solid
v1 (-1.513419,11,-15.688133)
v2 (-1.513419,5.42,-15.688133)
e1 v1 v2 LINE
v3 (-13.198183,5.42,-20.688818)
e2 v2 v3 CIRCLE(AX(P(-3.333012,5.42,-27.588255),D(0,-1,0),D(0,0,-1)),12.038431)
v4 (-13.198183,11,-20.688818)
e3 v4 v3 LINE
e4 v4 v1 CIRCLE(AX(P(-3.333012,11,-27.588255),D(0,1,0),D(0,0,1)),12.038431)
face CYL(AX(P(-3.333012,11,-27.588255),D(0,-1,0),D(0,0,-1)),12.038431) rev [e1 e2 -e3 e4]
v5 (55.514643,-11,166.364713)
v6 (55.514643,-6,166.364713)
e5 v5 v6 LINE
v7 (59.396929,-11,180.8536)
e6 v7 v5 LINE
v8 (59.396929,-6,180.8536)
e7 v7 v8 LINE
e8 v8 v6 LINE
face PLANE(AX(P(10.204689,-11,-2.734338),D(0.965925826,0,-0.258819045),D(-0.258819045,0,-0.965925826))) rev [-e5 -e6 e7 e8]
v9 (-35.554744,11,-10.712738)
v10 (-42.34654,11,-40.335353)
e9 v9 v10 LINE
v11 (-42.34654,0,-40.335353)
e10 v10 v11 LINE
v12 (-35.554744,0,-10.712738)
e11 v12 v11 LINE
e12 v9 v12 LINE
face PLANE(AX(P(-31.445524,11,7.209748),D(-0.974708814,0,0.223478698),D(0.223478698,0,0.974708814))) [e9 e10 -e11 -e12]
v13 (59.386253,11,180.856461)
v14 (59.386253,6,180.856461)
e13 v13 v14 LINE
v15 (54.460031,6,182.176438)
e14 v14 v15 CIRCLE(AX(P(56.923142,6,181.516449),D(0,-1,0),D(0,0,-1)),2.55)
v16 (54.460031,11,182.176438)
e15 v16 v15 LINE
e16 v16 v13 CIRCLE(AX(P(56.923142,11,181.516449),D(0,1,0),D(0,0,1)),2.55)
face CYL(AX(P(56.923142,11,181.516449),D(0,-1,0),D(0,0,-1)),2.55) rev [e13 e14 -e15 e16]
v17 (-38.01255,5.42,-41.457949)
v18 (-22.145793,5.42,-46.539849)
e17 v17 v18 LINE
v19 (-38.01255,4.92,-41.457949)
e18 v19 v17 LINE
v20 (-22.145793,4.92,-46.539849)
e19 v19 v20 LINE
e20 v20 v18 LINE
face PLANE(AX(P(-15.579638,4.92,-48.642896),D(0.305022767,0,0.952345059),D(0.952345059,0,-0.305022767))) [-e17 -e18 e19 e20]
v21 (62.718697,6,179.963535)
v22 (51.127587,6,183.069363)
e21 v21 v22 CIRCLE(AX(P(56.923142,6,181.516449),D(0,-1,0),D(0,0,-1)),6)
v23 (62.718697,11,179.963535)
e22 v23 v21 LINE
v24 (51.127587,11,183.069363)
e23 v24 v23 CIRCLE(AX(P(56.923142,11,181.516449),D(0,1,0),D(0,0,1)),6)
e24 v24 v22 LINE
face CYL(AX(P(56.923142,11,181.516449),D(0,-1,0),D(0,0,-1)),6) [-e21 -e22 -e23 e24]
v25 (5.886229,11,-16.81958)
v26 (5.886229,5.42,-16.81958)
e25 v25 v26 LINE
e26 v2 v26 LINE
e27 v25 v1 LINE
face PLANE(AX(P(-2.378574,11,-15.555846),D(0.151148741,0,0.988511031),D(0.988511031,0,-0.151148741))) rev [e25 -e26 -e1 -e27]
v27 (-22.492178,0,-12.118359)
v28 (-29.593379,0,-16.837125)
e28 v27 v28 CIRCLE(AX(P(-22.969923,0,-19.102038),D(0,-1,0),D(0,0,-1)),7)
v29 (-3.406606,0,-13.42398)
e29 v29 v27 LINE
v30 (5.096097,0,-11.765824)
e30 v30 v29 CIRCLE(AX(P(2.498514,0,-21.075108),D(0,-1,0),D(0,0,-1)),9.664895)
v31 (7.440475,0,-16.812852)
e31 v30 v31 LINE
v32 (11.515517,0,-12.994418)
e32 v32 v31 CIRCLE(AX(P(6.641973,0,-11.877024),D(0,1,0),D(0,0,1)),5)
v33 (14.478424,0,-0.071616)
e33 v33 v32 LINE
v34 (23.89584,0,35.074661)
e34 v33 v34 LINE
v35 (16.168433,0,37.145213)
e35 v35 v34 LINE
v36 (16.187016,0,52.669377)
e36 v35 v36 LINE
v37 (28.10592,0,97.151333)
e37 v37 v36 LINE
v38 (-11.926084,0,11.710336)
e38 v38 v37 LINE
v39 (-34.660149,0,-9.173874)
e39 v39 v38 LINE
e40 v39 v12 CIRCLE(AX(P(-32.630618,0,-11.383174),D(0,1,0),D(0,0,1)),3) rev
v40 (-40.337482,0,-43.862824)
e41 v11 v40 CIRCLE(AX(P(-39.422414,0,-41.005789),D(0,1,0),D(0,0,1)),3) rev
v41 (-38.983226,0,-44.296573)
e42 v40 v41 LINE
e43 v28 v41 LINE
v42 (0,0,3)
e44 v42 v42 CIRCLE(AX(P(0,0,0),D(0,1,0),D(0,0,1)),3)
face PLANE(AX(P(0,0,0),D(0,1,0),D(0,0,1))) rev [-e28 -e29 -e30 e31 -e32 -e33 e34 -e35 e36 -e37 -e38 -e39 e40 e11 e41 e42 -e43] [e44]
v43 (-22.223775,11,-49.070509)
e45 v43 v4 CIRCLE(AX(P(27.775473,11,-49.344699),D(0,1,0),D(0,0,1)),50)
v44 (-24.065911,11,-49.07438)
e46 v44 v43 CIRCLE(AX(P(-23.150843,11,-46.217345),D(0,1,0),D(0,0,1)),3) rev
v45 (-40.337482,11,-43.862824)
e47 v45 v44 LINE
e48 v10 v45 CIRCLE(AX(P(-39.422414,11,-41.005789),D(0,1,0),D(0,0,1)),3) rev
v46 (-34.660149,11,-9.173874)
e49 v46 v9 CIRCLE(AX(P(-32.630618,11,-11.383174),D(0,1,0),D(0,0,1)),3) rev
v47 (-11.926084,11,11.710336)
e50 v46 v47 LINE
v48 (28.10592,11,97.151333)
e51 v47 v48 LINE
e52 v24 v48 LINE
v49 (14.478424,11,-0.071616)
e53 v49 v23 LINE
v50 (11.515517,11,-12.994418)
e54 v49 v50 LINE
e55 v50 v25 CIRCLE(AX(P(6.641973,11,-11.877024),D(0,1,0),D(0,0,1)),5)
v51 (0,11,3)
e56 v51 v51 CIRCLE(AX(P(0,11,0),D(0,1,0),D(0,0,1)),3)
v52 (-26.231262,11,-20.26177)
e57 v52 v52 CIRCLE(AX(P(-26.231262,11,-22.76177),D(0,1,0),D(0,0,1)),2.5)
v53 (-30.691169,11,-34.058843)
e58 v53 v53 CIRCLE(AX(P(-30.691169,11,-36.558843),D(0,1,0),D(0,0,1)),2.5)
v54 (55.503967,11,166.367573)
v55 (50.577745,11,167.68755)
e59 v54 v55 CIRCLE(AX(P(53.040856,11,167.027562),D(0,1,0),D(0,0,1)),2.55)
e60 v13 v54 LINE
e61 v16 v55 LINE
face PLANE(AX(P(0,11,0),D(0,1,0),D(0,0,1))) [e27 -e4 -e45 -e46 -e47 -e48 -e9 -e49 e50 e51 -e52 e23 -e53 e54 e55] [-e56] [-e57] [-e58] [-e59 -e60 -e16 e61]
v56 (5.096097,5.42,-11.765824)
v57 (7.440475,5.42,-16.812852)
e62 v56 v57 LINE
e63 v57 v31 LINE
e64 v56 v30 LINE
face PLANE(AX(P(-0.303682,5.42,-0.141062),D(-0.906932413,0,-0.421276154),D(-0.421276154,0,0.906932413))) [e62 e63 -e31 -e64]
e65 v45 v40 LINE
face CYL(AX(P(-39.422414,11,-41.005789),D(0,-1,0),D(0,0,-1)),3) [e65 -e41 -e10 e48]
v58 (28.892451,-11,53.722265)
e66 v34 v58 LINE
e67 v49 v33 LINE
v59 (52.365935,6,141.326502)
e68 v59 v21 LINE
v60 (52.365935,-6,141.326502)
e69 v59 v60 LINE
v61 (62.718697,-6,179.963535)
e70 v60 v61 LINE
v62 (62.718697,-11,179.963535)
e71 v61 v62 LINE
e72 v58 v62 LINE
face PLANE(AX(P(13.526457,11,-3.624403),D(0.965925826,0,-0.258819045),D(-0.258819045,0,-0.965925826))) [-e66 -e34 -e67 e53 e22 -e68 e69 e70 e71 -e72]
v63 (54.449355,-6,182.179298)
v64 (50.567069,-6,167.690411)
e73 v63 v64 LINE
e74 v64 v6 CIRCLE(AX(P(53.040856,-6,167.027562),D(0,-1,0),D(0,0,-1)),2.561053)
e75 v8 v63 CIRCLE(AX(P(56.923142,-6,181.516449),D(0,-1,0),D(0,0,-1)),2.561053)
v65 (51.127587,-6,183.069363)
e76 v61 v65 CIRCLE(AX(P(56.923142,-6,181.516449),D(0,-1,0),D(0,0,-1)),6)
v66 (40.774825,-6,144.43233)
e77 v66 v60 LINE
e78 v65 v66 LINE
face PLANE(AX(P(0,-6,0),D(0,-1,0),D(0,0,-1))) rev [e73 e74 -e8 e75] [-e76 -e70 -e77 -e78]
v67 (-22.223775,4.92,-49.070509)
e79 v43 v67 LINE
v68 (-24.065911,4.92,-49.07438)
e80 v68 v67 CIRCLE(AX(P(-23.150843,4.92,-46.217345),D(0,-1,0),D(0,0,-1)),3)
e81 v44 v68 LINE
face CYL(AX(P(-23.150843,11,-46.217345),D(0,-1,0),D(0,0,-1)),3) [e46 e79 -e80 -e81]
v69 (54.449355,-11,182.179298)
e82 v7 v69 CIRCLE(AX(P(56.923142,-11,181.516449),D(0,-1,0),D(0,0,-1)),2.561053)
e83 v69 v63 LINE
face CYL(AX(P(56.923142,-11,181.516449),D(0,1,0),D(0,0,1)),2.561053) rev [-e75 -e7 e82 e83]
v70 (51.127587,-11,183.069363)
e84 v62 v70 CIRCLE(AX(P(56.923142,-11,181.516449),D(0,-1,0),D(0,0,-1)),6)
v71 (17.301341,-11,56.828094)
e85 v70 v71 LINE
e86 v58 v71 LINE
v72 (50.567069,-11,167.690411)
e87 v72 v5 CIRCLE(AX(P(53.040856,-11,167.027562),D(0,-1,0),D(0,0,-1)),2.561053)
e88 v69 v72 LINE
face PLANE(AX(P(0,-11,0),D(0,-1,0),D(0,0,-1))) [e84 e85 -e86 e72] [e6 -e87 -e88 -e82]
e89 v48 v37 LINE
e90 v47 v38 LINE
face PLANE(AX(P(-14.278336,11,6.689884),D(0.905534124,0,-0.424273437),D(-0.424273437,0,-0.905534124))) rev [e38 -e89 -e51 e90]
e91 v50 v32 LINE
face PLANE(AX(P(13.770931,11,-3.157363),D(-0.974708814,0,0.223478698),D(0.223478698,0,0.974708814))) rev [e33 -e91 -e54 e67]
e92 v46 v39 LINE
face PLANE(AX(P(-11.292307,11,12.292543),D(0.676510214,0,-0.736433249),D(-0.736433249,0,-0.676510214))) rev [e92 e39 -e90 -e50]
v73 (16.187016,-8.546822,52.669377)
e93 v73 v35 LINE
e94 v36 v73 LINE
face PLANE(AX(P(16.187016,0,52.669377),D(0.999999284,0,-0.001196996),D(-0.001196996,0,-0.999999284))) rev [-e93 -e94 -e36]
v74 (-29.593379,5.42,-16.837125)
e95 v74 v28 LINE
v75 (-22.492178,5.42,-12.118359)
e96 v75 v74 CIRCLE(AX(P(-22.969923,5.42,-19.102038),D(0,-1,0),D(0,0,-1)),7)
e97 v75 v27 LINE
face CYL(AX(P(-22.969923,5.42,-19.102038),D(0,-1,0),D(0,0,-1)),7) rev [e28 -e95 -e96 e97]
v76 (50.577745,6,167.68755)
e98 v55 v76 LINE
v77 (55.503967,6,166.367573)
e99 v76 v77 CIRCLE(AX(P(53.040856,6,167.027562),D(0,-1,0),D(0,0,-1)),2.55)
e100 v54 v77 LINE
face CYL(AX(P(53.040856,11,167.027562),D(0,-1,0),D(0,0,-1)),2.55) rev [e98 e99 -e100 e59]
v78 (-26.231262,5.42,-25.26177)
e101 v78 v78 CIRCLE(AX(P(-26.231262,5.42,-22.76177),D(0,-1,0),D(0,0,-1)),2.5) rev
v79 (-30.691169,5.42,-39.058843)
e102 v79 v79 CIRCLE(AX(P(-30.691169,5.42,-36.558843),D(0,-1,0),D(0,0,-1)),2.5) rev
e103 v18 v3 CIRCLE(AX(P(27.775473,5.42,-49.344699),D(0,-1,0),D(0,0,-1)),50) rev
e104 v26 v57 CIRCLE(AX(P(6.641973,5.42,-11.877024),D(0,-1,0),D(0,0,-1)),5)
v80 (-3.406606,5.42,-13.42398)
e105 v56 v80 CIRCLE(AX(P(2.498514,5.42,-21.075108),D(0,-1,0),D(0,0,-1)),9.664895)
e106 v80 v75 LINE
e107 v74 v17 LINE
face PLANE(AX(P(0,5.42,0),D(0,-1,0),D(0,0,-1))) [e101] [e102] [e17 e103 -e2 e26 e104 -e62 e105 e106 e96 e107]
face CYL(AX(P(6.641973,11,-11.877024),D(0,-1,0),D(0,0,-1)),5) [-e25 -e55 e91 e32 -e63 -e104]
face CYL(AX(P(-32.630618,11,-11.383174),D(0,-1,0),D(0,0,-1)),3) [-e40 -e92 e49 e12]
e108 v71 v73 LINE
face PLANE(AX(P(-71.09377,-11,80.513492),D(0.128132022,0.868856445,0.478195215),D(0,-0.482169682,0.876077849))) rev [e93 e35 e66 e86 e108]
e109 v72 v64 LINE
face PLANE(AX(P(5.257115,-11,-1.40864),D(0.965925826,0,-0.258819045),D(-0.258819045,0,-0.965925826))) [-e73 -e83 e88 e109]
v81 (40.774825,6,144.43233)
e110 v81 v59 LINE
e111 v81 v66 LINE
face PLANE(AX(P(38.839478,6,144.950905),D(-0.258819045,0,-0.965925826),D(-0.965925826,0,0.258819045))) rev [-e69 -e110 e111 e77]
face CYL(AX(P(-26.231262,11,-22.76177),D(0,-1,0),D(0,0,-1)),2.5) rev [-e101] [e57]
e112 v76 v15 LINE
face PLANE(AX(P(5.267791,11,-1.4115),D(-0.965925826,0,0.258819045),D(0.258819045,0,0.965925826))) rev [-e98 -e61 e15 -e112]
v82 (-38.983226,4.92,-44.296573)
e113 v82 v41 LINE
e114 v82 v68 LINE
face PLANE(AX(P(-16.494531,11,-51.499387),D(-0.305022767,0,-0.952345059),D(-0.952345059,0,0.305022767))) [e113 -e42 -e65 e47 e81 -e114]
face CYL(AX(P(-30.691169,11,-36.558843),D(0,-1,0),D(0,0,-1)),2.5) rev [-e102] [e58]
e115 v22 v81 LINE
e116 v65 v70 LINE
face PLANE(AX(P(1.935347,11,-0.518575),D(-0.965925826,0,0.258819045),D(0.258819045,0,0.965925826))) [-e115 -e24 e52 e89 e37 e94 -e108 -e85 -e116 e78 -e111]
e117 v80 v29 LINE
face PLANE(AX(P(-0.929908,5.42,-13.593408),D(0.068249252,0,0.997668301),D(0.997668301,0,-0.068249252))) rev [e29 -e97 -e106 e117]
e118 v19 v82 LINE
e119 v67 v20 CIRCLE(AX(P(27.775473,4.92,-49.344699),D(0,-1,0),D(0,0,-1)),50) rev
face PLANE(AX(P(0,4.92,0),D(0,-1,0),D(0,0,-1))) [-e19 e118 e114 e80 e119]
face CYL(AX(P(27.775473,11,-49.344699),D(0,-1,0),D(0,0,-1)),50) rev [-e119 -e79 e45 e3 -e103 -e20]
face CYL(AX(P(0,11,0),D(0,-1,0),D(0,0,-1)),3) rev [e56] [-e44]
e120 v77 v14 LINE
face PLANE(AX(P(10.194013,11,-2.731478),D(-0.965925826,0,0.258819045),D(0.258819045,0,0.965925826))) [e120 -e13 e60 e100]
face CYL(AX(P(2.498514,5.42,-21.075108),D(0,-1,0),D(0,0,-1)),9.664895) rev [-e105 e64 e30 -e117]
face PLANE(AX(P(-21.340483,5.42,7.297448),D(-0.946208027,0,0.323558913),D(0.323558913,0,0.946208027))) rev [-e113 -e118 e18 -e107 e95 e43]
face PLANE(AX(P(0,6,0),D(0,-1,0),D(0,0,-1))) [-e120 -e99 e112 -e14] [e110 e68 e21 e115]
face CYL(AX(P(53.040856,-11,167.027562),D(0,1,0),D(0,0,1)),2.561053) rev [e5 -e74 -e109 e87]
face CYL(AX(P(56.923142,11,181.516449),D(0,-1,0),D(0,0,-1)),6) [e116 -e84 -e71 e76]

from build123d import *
from build123d.topology import SkipClean

# Parameters (mm, degrees)
SKETCH1_R              = 2.5
SKETCH1_R_2            = 3
BOSS_EXTRUDE1_DEPTH    = 11
BOSS_EXTRUDE2_START    = 11
BOSS_EXTRUDE2_DEPTH    = 11
CUT_EXTRUDE8_START     = -5.42
CUT_EXTRUDE8_OUTLINE_R = 2.5
CUT_EXTRUDE8_DEPTH     = 5.42
CUT_EXTRUDE9_DEPTH     = 200.464537277
SKETCH22_W             = 1.692224542
SKETCH22_H             = 1
BOSS_EXTRUDE5_DEPTH    = 5.58
BOSS_EXTRUDE6_START    = 0.5
BOSS_EXTRUDE6_DEPTH    = 0.5
CUT_EXTRUDE11_START    = -5
CUT_EXTRUDE11_DEPTH    = 12
CUT_EXTRUDE12_DEPTH    = 11


# Read off the part's stored shape, not the designer's step: Cut-Extrude8
with BuildPart() as part:
    # Sketch1 → Boss-Extrude1 (new body)
    with BuildSketch(Plane(origin=(0, 0, 0), x_dir=(1, 0, 0), z_dir=(0, 1, 0))):
        with BuildLine():
            Line((-24.065911245, 49.074379963), (-40.33748217, 43.862823975))
            ThreePointArc((-40.33748217, 43.862823975), (-42.029254381, 42.490505115), (-42.346540309, 40.335352706))
            Line((-42.346540309, 40.335352706), (-35.554744394, 10.712738062))
            ThreePointArc((-35.554744394, 10.712738062), (-35.224207157, 9.875429138), (-34.660148596, 9.173874408))
            Line((-34.660148596, 9.173874408), (-11.926083617, -11.710336344))
            Line((-11.926083617, -11.710336344), (28.105920068, -97.151333217))
            Line((28.105920068, -97.151333217), (51.127586716, -183.069362819))
            ThreePointArc((51.127586716, -183.069362819), (58.476055497, -187.312004338), (62.718696966, -179.963535528))
            Line((62.718696966, -179.963535528), (14.478423579, 0.071615722))
            Line((14.478423579, 0.071615722), (11.515517153, 12.994417934))
            ThreePointArc((11.515517153, 12.994417934), (9.45213952, 16.012597514), (5.886229377, 16.819579599))
            Line((5.886229377, 16.819579599), (-1.513417826, 15.688133083))
            ThreePointArc((-1.513417826, 15.688133083), (-8.06952351, 16.520767077), (-13.198183321, 20.688818137))
            ThreePointArc((-13.198183321, 20.688818137), (-19.873214701, 34.19205636), (-22.223775344, 49.070508937))
            ThreePointArc((-22.223775344, 49.070508937), (-23.144538818, 49.217338163), (-24.065911245, 49.074379963))
        make_face()
        with BuildLine():
            ThreePointArc((59.386252708, -180.856460648), (57.583130416, -183.97956007), (54.460030994, -182.176437778))
            Line((54.460030994, -182.176437778), (50.577745318, -167.687550384))
            ThreePointArc((50.577745318, -167.687550384), (52.38086761, -164.564450962), (55.503967032, -166.367573254))
            Line((55.503967032, -166.367573254), (59.386252708, -180.856460648))
        make_face(mode=Mode.SUBTRACT)
        with Locations(Location((-26.231262377, 22.76176979, 0), (0, 0, 270))):
            Circle(SKETCH1_R, mode=Mode.SUBTRACT)
        with BuildLine():
            Line((-32.594396249, 32.813795701), (-31.813835797, 32.992760568))
            ThreePointArc((-31.813835797, 32.992760568), (-32.198538906, 32.878953378), (-32.594396249, 32.813795701))
        make_face(mode=Mode.SUBTRACT)
        with Locations(Location((-30.69116896, 36.558843149, 0), (0, 0, 270))):
            Circle(SKETCH1_R, mode=Mode.SUBTRACT)
        with Locations(Location((0, 0, 0), (0, 0, 270))):
            Circle(SKETCH1_R_2, mode=Mode.SUBTRACT)
    extrude(amount=BOSS_EXTRUDE1_DEPTH)

    # Sketch15 → Boss-Extrude2 (add)
    with SkipClean():  # the faces are left unmerged after this step: merging them gives an invalid solid
        with BuildSketch(Plane.XZ.offset(BOSS_EXTRUDE2_START)):
            with BuildLine():
                ThreePointArc((62.718696809, 179.963534942), (60.986991622, 177.102253359), (57.992587901, 175.612528046))
                Line((57.992587901, 175.612528046), (55.514643215, 166.364712579))
                ThreePointArc((55.514643215, 166.364712579), (52.378006935, 164.553774778), (50.567069134, 167.690411058))
                Line((50.567069134, 167.690411058), (53.04501382, 176.938226526))
                ThreePointArc((53.04501382, 176.938226526), (51.196646785, 179.725568352), (51.127586894, 183.069363484))
                Line((51.127586894, 183.069363484), (28.105920068, 97.151333217))
                Line((28.105920068, 97.151333217), (12.304730128, 38.18048954))
                Line((12.304730128, 38.18048954), (23.895840044, 35.074660999))
                Line((23.895840044, 35.074660999), (62.718696809, 179.963534942))
            make_face()
            with BuildLine():
                ThreePointArc((54.449354811, 182.179298453), (57.585991091, 183.990236254), (59.396928892, 180.853599973))
                Line((59.396928892, 180.853599973), (57.992587901, 175.612528046))
                ThreePointArc((57.992587901, 175.612528046), (60.986991622, 177.102253359), (62.718696809, 179.963534942))
                ThreePointArc((62.718696809, 179.963534942), (62.87181102, 180.73329206), (62.923141851, 181.516449213))
                ThreePointArc((62.923141851, 181.516449213), (57.706299005, 187.465118381), (51.127586894, 183.069363484))
                ThreePointArc((51.127586894, 183.069363484), (51.196646785, 179.725568352), (53.04501382, 176.938226526))
                Line((53.04501382, 176.938226526), (54.449354811, 182.179298453))
            make_face()
        extrude(amount=-BOSS_EXTRUDE2_DEPTH)

    # Cut-Extrude8 outline → Cut-Extrude8 (cut)
    with SkipClean():  # the faces are left unmerged after this step: merging them gives an invalid solid
        with BuildSketch(Plane.XZ.offset(CUT_EXTRUDE8_START)):
            with BuildLine():
                Line((7.440475273, -16.812852061), (5.096097174, -11.765824195))
                ThreePointArc((5.096097174, -11.765824195), (0.648562626, -11.588913559), (-3.406606041, -13.423979773))
                Line((-3.406606041, -13.423979773), (-22.492177879, -12.118359456))
                ThreePointArc((-22.492177879, -12.118359456), (-26.84408445, -13.271868588), (-29.593378831, -16.837125174))
                Line((-29.593378831, -16.837125174), (-38.983226386, -44.296573112))
                Line((-38.983226386, -44.296573112), (-24.065911245, -49.074379963))
                ThreePointArc((-24.065911245, -49.074379963), (-23.144538818, -49.217338163), (-22.223775344, -49.070508937))
                ThreePointArc((-22.223775344, -49.070508937), (-19.873214666, -34.19205625), (-13.198183188, -20.688817948))
                ThreePointArc((-13.198183188, -20.688817948), (-8.069523818, -16.520767209), (-1.513418717, -15.688132947))
                Line((-1.513418717, -15.688132947), (5.886229377, -16.819579599))
                ThreePointArc((5.886229377, -16.819579599), (6.663615332, -16.876977606), (7.440475273, -16.812852061))
            make_face()
            with Locations((-30.69116896, -36.558843149)):
                Circle(CUT_EXTRUDE8_OUTLINE_R, mode=Mode.SUBTRACT)
            with BuildLine():
                Line((-31.813835797, -32.992760568), (-32.594396249, -32.813795701))
                ThreePointArc((-32.594396249, -32.813795701), (-32.198538906, -32.878953378), (-31.813835797, -32.992760568))
            make_face(mode=Mode.SUBTRACT)
            with Locations((-26.231262377, -22.76176979)):
                Circle(CUT_EXTRUDE8_OUTLINE_R, mode=Mode.SUBTRACT)
        extrude(amount=CUT_EXTRUDE8_DEPTH, mode=Mode.SUBTRACT)

    # Sketch19 → Cut-Extrude9 (cut, through all)
    with SkipClean():  # the faces are left unmerged after this step: merging them gives an invalid solid
        with BuildSketch(Plane(origin=(13.526457033, 0, -3.624403239), x_dir=(-0.2588190451025201, 0, -0.9659258262890685), z_dir=(0.9659258262890686, 0, -0.2588190451025201))):
            Polygon((-59.369639824, -11), (-40.064219409, 0), (-40.064219409, -11), align=None)
        extrude(amount=-CUT_EXTRUDE9_DEPTH, mode=Mode.SUBTRACT)

    # Sketch22 → Boss-Extrude5 (add, through all)
    with SkipClean():  # the faces are left unmerged after this step: merging them gives an invalid solid
        with BuildSketch(Plane.XZ.offset(-5.42)):
            with Locations((-32.253882585, -32.818926128)):
                Rectangle(SKETCH22_W, SKETCH22_H)
        extrude(amount=-BOSS_EXTRUDE5_DEPTH)

    # Sketch23 → Boss-Extrude6 (add)
    with SkipClean():  # the faces are left unmerged after this step: merging them gives an invalid solid
        with BuildSketch(Plane.XZ.offset(-5.42).offset(BOSS_EXTRUDE6_START)):
            with BuildLine():
                Line((-26.008052503, -45.302821126), (-38.012549647, -41.457949032))
                Line((-38.012549647, -41.457949032), (-38.983226386, -44.296573112))
                Line((-38.983226386, -44.296573112), (-24.065911245, -49.074379963))
                ThreePointArc((-24.065911245, -49.074379963), (-25.817991998, -47.590776952), (-26.008052503, -45.302821126))
            make_face()
            with BuildLine():
                Line((-22.14579331, -46.539848584), (-26.008052503, -45.302821126))
                ThreePointArc((-26.008052503, -45.302821126), (-25.817991998, -47.590776952), (-24.065911245, -49.074379963))
                ThreePointArc((-24.065911245, -49.074379963), (-23.144538818, -49.217338163), (-22.223775344, -49.070508937))
                ThreePointArc((-22.223775344, -49.070508937), (-22.200805099, -47.804685082), (-22.14579331, -46.539848584))
            make_face()
        extrude(amount=-BOSS_EXTRUDE6_DEPTH)

    # Sketch26 → Cut-Extrude11 (cut)
    with BuildSketch(Plane.XZ.offset(11).offset(CUT_EXTRUDE11_START)):
        Polygon((184.237099145, 679.840826179), (51.127586894, 183.069363484), (40.774825089, 144.432330432), (52.365935005, 141.326501891), (62.718696809, 179.963534942), (195.828209061, 676.734997637), (462.047233565, 1670.277923027), (450.456123649, 1673.383751569), align=None)
    extrude(amount=-CUT_EXTRUDE11_DEPTH, mode=Mode.SUBTRACT)

    # Sketch27 → Cut-Extrude12 (cut)
    with BuildSketch(Plane.XZ.offset(11)):
        Polygon((12.304730128, 38.18048954), (16.187015805, 52.669376935), (16.168433433, 37.14521336), align=None)
    extrude(amount=-CUT_EXTRUDE12_DEPTH, mode=Mode.SUBTRACT)


solid = part.part
